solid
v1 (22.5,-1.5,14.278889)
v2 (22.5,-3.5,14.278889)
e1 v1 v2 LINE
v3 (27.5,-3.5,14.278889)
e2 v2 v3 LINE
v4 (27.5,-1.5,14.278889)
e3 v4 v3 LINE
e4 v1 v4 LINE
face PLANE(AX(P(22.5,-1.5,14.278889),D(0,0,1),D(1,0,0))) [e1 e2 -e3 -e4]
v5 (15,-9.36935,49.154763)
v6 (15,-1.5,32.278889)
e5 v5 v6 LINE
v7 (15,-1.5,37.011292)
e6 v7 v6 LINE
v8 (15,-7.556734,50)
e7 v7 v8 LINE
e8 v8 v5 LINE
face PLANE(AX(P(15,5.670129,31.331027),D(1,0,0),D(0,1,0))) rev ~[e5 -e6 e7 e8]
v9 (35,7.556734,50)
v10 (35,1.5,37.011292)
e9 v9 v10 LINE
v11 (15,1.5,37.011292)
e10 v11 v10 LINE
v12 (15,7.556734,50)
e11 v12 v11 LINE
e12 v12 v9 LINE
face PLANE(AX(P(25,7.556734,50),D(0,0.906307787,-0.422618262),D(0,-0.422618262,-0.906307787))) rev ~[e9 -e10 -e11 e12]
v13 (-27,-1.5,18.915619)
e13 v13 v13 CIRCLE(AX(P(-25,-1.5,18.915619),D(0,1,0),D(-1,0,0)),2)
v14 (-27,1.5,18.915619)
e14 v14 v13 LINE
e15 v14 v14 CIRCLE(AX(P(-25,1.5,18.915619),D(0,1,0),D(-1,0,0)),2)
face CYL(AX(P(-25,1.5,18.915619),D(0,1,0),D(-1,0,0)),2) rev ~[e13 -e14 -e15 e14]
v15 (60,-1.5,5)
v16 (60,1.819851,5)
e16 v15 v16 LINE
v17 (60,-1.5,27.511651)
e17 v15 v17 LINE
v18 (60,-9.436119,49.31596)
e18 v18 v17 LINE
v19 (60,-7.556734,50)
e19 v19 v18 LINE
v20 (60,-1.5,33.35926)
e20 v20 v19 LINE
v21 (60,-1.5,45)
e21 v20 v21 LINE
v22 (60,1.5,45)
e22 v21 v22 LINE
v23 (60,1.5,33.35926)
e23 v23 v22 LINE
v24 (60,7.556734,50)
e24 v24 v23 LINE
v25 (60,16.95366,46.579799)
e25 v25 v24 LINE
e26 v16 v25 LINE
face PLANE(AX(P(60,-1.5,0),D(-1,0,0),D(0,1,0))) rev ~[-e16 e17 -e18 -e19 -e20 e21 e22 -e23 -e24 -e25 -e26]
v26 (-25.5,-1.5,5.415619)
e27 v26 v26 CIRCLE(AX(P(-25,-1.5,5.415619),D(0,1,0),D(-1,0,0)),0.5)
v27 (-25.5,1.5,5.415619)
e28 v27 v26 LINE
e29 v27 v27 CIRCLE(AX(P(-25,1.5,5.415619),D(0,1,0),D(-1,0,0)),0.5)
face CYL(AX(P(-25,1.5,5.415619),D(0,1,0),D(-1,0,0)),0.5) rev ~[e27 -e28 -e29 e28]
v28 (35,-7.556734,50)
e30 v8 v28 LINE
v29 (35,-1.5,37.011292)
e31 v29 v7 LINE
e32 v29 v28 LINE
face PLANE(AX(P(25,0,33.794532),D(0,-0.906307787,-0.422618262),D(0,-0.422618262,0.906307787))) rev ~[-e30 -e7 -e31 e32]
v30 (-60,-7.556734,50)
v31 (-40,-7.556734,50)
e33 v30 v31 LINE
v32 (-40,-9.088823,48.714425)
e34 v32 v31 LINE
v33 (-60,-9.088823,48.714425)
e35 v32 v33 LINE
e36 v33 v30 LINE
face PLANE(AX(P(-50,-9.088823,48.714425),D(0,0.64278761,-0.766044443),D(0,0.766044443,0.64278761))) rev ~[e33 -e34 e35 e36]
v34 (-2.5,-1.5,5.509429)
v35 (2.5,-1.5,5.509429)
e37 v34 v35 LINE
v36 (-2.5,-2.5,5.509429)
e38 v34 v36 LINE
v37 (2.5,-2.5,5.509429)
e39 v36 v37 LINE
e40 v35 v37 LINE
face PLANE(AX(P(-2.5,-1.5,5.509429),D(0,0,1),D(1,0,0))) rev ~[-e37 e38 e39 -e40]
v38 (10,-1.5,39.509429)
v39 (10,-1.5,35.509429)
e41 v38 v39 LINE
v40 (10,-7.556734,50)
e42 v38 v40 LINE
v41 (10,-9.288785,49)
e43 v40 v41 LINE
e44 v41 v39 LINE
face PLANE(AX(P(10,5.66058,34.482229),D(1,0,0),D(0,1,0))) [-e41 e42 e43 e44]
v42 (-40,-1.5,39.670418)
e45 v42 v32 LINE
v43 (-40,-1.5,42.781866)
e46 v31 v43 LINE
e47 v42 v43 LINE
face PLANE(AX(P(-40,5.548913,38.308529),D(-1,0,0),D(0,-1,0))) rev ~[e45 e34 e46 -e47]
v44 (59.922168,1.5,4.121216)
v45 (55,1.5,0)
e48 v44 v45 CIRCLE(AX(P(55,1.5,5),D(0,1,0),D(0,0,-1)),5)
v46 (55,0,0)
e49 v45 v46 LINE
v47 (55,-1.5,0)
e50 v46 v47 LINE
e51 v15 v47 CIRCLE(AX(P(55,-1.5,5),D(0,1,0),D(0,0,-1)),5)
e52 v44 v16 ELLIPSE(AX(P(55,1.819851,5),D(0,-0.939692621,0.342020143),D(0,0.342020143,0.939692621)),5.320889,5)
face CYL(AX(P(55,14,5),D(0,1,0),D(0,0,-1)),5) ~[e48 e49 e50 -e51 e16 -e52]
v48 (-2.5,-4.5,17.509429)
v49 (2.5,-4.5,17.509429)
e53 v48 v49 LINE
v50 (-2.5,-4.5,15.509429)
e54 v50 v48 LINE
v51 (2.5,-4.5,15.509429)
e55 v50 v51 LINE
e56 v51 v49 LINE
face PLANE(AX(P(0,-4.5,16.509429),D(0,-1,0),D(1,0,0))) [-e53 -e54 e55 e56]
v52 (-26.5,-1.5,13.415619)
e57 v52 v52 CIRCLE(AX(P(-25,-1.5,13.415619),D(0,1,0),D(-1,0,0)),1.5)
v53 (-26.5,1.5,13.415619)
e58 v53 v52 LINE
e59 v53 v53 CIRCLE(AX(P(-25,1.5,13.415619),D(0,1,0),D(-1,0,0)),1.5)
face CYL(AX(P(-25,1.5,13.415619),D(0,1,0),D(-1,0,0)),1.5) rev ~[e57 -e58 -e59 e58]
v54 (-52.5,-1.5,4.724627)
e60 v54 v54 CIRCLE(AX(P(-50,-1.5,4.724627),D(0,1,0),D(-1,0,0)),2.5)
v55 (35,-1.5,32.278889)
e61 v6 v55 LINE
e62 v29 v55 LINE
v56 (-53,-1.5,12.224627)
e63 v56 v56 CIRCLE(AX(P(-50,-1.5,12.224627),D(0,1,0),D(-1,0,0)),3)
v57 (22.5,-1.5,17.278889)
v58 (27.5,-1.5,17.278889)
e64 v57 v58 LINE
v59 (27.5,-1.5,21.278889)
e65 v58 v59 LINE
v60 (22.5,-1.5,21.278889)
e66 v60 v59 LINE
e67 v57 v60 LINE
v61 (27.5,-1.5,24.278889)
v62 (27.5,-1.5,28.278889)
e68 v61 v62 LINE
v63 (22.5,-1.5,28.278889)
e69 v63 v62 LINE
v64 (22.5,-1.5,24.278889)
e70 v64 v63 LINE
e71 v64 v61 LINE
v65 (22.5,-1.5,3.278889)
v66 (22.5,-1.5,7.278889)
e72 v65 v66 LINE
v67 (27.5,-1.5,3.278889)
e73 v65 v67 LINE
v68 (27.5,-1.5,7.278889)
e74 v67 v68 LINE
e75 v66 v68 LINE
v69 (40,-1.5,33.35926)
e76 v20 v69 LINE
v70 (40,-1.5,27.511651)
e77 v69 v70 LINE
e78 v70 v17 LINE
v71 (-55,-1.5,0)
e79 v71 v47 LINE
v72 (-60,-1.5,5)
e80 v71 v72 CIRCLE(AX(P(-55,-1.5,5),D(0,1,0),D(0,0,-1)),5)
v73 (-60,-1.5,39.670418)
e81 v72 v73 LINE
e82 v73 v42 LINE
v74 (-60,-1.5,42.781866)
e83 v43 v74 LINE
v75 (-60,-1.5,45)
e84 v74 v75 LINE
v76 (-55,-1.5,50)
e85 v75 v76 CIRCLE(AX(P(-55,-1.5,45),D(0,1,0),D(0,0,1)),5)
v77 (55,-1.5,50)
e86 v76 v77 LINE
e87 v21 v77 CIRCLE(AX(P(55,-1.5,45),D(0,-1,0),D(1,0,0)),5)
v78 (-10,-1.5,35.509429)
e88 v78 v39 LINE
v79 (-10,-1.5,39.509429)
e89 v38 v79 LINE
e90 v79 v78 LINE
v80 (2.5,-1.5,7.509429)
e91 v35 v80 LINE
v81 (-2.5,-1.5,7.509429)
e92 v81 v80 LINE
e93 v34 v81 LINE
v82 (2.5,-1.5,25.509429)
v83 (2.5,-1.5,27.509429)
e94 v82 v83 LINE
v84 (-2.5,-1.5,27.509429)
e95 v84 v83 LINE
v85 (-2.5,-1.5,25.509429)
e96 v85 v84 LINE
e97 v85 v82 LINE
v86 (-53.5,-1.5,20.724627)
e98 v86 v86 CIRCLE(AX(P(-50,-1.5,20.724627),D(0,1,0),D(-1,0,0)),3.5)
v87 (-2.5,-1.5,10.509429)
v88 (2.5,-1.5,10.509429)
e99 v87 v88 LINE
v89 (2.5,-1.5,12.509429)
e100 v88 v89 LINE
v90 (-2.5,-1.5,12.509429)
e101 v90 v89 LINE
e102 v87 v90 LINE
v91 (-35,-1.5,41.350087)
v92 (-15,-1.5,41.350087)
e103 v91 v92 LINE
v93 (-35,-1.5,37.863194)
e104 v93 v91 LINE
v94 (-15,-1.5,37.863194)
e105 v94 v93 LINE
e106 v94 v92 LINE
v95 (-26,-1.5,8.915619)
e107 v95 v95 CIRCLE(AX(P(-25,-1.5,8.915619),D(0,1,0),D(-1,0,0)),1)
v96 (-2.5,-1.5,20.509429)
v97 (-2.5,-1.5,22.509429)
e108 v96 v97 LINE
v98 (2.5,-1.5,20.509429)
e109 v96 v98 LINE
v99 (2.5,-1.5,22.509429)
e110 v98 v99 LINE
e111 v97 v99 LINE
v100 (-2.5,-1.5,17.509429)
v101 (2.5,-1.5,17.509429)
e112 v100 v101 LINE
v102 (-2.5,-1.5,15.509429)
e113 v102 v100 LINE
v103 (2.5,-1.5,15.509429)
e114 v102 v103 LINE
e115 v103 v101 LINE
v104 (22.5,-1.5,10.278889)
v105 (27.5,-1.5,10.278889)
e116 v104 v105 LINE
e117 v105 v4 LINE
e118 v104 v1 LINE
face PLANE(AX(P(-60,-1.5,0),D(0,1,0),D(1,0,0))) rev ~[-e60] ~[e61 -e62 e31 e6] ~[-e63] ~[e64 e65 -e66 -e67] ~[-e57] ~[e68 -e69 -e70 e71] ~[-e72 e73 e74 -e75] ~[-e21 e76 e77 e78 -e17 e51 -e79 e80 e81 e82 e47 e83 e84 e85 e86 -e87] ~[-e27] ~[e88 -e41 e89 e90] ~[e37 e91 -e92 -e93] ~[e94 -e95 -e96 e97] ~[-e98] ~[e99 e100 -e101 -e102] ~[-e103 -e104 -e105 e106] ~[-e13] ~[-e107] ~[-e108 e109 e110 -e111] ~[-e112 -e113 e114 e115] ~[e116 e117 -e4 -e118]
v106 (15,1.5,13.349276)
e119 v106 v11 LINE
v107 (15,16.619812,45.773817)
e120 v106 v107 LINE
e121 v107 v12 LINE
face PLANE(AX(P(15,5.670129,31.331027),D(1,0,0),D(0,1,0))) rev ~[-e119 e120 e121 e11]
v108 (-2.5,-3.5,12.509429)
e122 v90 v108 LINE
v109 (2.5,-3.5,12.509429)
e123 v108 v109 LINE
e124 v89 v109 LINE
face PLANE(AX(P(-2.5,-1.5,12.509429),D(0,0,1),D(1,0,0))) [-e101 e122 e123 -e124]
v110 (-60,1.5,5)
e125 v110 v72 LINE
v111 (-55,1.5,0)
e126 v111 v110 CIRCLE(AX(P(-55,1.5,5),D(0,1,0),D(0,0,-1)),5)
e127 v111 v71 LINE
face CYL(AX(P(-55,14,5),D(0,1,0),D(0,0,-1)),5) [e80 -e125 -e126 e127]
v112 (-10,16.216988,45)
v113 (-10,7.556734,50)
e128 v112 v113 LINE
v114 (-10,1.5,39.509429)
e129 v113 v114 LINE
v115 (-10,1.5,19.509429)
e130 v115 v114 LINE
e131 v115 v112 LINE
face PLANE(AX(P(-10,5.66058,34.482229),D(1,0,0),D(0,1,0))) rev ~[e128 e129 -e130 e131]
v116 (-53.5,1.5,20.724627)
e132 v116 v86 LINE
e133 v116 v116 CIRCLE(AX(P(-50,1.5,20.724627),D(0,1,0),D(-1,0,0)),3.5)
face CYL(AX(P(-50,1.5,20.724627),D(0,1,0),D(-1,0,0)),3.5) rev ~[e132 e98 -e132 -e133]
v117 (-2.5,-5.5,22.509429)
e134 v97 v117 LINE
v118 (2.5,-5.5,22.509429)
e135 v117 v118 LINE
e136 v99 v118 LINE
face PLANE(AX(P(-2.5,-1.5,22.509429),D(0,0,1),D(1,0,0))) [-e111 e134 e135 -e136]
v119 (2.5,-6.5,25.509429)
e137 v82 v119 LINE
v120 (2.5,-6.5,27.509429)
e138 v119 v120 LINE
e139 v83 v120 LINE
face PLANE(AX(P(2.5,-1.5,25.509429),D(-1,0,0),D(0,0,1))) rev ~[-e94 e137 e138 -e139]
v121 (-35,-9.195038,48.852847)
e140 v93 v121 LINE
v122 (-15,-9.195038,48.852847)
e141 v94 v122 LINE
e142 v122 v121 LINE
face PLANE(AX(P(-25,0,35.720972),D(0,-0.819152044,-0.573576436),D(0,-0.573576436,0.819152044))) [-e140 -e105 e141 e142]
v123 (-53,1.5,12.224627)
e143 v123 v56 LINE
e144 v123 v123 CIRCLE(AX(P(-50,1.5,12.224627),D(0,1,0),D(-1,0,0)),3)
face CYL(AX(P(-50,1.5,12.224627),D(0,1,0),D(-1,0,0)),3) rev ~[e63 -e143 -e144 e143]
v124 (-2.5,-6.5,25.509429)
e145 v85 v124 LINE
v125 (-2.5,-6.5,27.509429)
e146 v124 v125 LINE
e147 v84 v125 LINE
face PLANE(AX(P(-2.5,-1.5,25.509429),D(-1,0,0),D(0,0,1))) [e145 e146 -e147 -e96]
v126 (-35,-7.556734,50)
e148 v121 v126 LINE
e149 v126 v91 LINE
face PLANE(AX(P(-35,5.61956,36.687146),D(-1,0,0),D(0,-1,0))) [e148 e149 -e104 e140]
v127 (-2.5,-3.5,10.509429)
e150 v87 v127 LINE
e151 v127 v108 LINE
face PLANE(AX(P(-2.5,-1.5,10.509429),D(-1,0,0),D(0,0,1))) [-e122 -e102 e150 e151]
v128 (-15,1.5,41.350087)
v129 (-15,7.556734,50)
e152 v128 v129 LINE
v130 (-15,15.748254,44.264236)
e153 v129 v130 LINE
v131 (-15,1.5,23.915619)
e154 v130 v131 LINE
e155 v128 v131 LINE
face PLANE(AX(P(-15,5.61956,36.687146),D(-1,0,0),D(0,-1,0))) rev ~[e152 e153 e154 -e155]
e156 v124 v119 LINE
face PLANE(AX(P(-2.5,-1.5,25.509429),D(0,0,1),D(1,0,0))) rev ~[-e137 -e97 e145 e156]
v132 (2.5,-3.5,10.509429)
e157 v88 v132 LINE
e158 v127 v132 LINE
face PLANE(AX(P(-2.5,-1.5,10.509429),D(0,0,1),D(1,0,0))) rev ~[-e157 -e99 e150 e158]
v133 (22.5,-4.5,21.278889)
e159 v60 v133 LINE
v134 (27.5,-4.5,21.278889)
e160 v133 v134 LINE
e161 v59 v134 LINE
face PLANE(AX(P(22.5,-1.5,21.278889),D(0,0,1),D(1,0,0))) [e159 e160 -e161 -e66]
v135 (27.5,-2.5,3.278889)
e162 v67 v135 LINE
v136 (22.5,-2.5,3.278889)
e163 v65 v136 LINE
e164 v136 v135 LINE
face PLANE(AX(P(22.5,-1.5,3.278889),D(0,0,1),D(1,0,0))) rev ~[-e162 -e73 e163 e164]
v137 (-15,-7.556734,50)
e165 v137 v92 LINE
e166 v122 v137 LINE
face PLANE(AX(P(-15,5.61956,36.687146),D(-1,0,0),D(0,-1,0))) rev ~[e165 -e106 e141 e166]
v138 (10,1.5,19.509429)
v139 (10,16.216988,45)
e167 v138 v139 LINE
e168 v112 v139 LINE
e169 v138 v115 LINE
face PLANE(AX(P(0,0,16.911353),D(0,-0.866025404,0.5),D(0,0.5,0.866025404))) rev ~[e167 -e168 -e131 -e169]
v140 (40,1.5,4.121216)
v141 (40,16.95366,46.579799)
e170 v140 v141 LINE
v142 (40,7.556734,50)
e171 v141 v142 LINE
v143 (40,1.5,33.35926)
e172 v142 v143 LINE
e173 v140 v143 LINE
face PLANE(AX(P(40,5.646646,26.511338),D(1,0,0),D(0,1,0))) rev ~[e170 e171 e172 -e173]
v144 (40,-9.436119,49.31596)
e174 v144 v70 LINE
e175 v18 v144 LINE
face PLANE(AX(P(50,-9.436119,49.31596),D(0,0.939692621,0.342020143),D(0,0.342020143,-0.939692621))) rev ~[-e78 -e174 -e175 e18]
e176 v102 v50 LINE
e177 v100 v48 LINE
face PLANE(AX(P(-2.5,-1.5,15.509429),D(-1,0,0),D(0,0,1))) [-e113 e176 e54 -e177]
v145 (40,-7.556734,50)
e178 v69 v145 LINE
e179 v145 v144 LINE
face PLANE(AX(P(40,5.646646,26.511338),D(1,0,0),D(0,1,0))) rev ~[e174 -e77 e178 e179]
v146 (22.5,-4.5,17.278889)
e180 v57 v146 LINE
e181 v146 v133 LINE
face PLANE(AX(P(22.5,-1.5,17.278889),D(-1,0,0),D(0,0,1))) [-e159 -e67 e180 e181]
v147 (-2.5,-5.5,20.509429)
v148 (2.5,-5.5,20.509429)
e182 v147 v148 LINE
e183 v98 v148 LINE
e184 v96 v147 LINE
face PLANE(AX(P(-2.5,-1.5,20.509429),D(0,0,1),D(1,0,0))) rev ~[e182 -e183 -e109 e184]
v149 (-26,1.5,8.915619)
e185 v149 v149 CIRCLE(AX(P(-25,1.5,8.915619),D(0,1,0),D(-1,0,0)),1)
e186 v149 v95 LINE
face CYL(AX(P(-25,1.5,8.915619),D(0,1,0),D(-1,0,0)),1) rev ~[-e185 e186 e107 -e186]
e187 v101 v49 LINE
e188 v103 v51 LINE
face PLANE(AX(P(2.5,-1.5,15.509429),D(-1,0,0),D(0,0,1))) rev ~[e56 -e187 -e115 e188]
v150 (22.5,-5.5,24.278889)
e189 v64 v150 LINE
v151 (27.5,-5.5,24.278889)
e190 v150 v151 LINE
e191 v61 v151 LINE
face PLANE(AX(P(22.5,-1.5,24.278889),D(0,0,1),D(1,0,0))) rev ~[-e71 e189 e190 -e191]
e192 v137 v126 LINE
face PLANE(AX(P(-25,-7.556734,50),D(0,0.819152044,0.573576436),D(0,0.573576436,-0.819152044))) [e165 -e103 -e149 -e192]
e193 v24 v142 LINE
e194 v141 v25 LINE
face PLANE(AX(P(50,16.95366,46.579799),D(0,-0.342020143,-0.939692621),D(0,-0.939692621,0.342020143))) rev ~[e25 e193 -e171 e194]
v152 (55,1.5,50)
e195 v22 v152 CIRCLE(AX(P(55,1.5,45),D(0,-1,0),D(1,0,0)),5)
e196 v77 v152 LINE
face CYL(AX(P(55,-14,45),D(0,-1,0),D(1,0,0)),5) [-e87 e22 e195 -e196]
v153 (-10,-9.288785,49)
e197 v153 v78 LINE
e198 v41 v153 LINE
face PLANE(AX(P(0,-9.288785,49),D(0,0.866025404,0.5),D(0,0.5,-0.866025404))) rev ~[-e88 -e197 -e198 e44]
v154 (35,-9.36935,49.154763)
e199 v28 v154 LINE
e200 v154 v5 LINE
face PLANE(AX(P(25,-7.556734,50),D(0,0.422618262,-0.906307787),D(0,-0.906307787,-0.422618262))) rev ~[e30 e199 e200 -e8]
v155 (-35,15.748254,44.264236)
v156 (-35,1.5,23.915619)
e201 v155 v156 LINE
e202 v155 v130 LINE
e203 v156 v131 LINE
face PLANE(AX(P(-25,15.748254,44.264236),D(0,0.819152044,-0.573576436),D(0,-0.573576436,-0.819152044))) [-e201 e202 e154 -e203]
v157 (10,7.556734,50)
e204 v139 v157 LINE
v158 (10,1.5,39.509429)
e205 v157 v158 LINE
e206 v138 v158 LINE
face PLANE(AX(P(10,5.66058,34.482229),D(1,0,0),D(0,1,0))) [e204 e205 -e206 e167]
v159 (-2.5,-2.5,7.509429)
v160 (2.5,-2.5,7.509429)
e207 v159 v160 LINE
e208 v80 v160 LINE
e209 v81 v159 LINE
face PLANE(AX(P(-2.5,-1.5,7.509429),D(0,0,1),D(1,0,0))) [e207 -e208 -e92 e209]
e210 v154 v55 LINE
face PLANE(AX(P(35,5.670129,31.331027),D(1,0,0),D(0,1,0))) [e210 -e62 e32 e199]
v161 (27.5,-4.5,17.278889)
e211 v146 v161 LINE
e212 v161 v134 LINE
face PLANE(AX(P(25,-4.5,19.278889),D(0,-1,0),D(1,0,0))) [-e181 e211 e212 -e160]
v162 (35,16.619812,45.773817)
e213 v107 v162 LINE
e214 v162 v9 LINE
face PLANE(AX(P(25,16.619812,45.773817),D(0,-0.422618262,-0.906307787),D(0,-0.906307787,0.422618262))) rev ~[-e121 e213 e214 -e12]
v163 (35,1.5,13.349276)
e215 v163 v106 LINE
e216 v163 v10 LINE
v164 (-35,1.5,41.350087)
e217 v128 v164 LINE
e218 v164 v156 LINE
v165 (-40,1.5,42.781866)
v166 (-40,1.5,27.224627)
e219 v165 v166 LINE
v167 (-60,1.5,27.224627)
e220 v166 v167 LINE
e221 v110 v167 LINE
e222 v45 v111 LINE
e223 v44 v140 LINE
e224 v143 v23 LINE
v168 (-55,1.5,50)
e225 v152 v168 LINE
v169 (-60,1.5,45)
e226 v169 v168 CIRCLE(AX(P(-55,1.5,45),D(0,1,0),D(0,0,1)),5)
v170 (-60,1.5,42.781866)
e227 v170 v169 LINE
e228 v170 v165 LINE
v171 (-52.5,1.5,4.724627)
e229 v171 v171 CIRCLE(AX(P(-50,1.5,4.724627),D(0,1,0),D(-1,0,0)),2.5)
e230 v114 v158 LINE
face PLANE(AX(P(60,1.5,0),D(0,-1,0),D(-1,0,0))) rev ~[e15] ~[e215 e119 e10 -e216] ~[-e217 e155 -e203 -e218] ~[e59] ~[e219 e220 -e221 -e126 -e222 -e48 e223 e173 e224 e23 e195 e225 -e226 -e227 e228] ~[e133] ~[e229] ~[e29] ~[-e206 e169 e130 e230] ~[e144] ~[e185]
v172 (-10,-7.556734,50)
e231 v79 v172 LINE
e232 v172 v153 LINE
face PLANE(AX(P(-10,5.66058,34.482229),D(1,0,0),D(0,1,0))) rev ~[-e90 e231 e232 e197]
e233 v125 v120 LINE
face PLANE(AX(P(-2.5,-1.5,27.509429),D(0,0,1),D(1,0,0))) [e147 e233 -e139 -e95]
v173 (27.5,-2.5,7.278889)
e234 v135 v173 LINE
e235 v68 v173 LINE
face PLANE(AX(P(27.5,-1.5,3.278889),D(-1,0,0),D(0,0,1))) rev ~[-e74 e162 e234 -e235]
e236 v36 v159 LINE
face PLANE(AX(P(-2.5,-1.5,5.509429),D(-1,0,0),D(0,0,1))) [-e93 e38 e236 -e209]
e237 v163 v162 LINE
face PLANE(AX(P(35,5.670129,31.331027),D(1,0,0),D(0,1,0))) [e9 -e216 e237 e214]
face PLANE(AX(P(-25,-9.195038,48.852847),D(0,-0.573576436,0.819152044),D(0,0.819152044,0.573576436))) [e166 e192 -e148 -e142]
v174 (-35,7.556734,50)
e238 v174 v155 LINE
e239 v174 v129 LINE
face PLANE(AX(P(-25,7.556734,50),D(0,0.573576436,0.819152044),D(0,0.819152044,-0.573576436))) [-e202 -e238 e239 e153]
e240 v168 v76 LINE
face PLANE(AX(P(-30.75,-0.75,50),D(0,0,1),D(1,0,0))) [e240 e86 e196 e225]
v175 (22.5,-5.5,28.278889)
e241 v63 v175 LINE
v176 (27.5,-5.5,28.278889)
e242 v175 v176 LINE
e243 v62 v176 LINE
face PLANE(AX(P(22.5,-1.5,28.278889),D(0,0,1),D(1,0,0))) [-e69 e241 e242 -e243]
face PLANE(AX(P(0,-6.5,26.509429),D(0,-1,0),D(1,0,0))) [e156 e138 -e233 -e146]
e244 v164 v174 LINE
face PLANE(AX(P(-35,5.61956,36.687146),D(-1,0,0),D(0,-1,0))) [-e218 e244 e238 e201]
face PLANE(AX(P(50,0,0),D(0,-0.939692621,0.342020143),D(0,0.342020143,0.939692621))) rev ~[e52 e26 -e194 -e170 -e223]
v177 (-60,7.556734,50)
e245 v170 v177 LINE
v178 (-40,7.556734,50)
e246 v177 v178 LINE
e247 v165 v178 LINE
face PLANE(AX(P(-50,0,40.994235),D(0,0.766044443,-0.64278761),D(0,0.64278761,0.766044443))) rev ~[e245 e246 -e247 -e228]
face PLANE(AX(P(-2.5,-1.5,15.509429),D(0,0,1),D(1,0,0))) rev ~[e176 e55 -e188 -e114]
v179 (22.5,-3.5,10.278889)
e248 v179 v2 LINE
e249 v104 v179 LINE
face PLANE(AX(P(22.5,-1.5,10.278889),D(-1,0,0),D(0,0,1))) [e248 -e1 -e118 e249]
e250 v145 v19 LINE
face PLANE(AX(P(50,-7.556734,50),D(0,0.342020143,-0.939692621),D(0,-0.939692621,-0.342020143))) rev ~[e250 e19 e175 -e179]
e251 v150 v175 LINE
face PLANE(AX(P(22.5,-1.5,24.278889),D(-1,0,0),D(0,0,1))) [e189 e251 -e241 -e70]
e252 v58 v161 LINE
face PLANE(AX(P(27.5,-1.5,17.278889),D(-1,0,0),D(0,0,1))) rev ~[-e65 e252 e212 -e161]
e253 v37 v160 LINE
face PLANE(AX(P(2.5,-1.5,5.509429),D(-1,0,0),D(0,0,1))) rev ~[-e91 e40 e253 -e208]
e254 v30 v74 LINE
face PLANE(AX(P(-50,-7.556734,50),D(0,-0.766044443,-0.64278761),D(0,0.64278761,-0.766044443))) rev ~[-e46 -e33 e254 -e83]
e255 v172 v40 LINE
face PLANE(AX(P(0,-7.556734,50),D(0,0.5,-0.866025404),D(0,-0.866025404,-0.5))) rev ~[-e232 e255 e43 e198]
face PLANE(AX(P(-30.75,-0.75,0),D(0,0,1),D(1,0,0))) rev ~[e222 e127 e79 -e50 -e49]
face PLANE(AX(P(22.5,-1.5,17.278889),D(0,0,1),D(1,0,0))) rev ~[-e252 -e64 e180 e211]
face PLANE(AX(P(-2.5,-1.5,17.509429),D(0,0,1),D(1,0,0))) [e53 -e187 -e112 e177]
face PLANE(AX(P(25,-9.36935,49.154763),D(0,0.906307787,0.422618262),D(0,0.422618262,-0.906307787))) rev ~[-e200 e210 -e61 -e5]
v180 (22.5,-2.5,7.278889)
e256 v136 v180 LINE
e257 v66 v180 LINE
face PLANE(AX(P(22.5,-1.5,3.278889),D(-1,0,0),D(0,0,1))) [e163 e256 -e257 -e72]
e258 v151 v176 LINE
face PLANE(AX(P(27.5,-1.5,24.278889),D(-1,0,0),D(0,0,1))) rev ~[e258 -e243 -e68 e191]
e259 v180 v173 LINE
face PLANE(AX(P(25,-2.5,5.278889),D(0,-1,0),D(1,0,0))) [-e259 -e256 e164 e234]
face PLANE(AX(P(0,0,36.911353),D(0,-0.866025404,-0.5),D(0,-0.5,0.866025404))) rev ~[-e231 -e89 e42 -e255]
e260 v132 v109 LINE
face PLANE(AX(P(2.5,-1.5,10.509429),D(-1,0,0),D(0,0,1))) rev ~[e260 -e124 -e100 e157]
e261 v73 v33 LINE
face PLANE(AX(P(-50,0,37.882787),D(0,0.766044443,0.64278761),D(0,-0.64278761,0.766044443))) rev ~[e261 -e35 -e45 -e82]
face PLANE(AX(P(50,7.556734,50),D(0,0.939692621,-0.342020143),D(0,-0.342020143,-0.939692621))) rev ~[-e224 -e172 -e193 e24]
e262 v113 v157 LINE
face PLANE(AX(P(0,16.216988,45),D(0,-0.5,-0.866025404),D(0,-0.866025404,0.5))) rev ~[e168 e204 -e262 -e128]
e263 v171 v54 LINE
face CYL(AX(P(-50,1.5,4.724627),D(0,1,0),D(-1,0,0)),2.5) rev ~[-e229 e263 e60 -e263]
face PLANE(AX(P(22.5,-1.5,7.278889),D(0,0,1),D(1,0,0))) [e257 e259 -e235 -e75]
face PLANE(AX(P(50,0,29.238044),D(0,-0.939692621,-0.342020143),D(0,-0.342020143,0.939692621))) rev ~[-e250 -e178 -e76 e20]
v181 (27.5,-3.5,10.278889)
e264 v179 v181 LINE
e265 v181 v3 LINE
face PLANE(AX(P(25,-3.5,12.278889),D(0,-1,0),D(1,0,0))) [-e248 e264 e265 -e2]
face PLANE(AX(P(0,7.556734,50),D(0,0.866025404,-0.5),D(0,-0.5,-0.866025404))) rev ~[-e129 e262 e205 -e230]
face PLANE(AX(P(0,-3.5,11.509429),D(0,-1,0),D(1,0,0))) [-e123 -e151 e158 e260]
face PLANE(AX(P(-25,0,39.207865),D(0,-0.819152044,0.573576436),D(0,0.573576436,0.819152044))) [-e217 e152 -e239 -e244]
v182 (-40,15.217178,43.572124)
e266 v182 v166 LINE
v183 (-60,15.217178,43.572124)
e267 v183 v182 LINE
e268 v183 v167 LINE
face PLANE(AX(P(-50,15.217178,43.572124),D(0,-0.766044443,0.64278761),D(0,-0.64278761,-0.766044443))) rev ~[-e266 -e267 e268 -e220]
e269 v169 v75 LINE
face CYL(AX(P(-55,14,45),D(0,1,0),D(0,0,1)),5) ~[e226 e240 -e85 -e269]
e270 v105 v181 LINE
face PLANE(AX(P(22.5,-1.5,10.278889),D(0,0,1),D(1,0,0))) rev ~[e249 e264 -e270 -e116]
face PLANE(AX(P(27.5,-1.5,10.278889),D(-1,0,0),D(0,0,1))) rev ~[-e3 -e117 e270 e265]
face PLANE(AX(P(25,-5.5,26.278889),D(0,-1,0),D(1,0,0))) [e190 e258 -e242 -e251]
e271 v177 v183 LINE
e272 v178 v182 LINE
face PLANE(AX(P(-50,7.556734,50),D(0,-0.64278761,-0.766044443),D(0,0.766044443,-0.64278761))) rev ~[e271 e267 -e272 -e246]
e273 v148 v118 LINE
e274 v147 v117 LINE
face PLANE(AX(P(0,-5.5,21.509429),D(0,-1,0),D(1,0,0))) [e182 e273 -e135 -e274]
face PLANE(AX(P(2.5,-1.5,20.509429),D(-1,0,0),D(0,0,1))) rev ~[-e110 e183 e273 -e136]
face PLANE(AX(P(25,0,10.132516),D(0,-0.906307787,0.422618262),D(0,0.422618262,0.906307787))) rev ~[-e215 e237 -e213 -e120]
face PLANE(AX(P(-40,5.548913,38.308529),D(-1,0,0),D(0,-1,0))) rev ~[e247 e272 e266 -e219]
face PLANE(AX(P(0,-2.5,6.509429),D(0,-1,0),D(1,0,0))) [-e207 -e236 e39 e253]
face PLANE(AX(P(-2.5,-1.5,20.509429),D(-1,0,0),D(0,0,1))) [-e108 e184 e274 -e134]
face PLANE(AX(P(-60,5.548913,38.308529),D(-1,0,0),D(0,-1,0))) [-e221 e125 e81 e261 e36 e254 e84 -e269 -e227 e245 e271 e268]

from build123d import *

# Parameters (mm, degrees)
F0_W          = 58.5
F0_H          = 1.5
F0_H_2        = 3
F1_DEPTH      = 50
F9_DEPTH      = 10
F10_T1_DEPTH  = 28
F10_T3_DEPTH  = 14
F10_T5_DEPTH  = 14
F10_T10_DEPTH = 28
F10_T16_DEPTH = 28
F11_R         = 0.5
F11_R_2       = 1
F11_R_3       = 1.5
F11_R_4       = 2
F11_R_5       = 2.5
F11_R_6       = 3
F11_R_7       = 3.5
F12_DEPTH     = 3
F13_W         = 5
F13_H         = 2
F14_W         = 5
F14_H         = 4
F15_DEPTH     = 1
F16_DEPTH     = 2
F17_DEPTH     = 3
F18_DEPTH     = 4
F19_DEPTH     = 5


# Not quite as in the source:
# - a fillet or chamfer that OpenCascade refuses, or shapes differently, is made with other operations: its cross-section is extruded or revolved along the edge and cut away or added


with BuildPart() as f1:
    # F0 (on Top) → F1 (new body)
    with BuildSketch(Plane.XY):
        with Locations((-30.75, -0.75)):
            Rectangle(F0_W, F0_H)
        with Locations((-30.75, 0.75)):
            Rectangle(F0_W, F0_H)
        Polygon((1.5, 1.5), (-1.5, 1.5), (-1.5, 0), (-1.5, -1.5), (1.5, -1.5), align=None)
        with Locations((30.75, 0)):
            Rectangle(F0_W, F0_H_2)
    extrude(amount=F1_DEPTH)

    # F4 (on offset) + F5 (on offset) + F6 (on Right) + F7 (on face) + F8 (on face) → F9 (join, symmetric)
    with BuildSketch(Plane.YZ.offset(50)):
        Polygon((0, 23.3904352013), (0, 0), (16.9536601964, 46.5797985667), (7.5567339886, 50), (0, 29.2380440016), align=None)
        Polygon((-9.4361192301, 49.3159597133), (0, 23.3904352013), (0, 29.2380440016), (-7.5567339886, 50), align=None)
    with BuildSketch(Plane.YZ.offset(25)):
        Polygon((0, 29.0621284988), (0, 10.1325158336), (16.6198118589, 45.7738173826), (7.5567339886, 50), (0, 33.7945316651), align=None)
        Polygon((-9.3693495626, 49.1547634765), (0, 29.0621284988), (0, 33.7945316651), (-7.5567339886, 50), align=None)
    with BuildSketch(Plane.YZ):
        Polygon((0, 32.9113527925), (0, 16.9113527925), (16.2169880264, 45), (7.5567339886, 50), (0, 36.9113527925), align=None)
        Polygon((-9.2887847961, 49), (0, 32.9113527925), (0, 36.9113527925), (-7.5567339886, 50), align=None)
    with BuildSketch(Plane(origin=(-25, 0, 0), x_dir=(0, -1, 0), z_dir=(-1, 0, 0))):
        Polygon((-15.7482544314, 44.2642356365), (0, 21.7733974606), (0, 35.7209718255), (0, 39.2078654168), (-7.5567339886, 50), align=None)
        Polygon((0, 39.2078654168), (0, 35.7209718255), (9.1950380771, 48.8528471273), (7.5567339886, 50), align=None)
    with BuildSketch(Plane(origin=(-50, 0, 0), x_dir=(0, -1, 0), z_dir=(-1, 0, 0))):
        Polygon((-15.2171784197, 43.5721239031), (0, 25.4369968523), (0, 37.8827874671), (0, 40.9942351209), (-7.5567339886, 50), align=None)
        Polygon((0, 40.9942351209), (0, 37.8827874671), (9.0888228748, 48.7144247806), (7.5567339886, 50), align=None)
    extrude(amount=F9_DEPTH, both=True, dir=(1, 0, 0))

    # F10: fillet of radius 5 on 5 edges, made by hand

    # F10_s2 → F10_t1 (cut)
    with BuildSketch(Plane.XZ.offset(-14)):
        with BuildLine():
            ThreePointArc((-55, 0), (-58.5355339059, 1.4644660941), (-60, 5))
            Line((-60, 5), (-60, 0))
            Line((-60, 0), (-55, 0))
        make_face()
    extrude(amount=F10_T1_DEPTH, mode=Mode.SUBTRACT)

    # F10_s4 → F10_t3 (cut)
    with BuildSketch(Plane.XZ):
        with BuildLine():
            ThreePointArc((55, 0), (58.5355339059, 1.4644660941), (60, 5))
            Line((60, 5), (60, 0))
            Line((60, 0), (55, 0))
        make_face()
    extrude(amount=F10_T3_DEPTH, mode=Mode.SUBTRACT)

    # F10_s6 → F10_t5 (cut)
    with BuildSketch(Plane.XZ.offset(-14)):
        with BuildLine():
            ThreePointArc((55, 0), (58.5355339059, 1.4644660941), (60, 5))
            Line((60, 5), (60, 0))
            Line((60, 0), (55, 0))
        make_face()
    extrude(amount=F10_T5_DEPTH, mode=Mode.SUBTRACT)


with BuildPart() as f10_tool8:
    # F10_s9 → F10_t10 (new body)
    with BuildSketch(Plane.XZ.offset(14)):
        with BuildLine():
            ThreePointArc((60, 45), (58.5355339059, 48.5355339059), (55, 50))
            Line((55, 50), (60, 50))
            Line((60, 50), (60, 45))
        make_face()
    extrude(amount=-F10_T10_DEPTH)

    split(bisect_by=Plane(origin=(0, 9.3969262079, 3.4202014333), x_dir=(1, 0, 0), z_dir=(0, 0.9396926208, 0.3420201433)), keep=Keep.TOP)

    split(bisect_by=Plane(origin=(0, -9.3969262079, 3.4202014333), x_dir=(1, 0, 0), z_dir=(0, -0.9396926208, 0.3420201433)), keep=Keep.TOP)


with BuildPart() as f1_1:
    add(f1.part)

    # F10_t7: cut F10_tool8
    add(f10_tool8.part, mode=Mode.SUBTRACT)


with BuildPart() as f10_tool14:
    # F10_s15 → F10_t16 (new body)
    with BuildSketch(Plane.XZ.offset(-14)):
        with BuildLine():
            ThreePointArc((-55, 50), (-58.5355339059, 48.5355339059), (-60, 45))
            Line((-60, 45), (-60, 50))
            Line((-60, 50), (-55, 50))
        make_face()
    extrude(amount=F10_T16_DEPTH)

    split(bisect_by=Plane(origin=(0, 20.1857202879, 16.9378304486), x_dir=(1, 0, 0), z_dir=(0, 0.7660444431, 0.6427876097)), keep=Keep.TOP)

    split(bisect_by=Plane(origin=(0, -20.1857202879, 16.9378304486), x_dir=(1, 0, 0), z_dir=(0, -0.7660444431, 0.6427876097)), keep=Keep.TOP)


with BuildPart() as f1_2:
    add(f1_1.part)

    # F10_t13: cut F10_tool14
    add(f10_tool14.part, mode=Mode.SUBTRACT)

    # F11 (on face) → F12 (cut, through all)
    with BuildSketch(Plane(origin=(0, 1.5, 0), x_dir=(-1, 0, 0), z_dir=(0, 1, 0))):
        with Locations((25, 5.4156194707)):
            Circle(F11_R)
        with Locations((25, 8.9156194707)):
            Circle(F11_R_2)
        with Locations((25, 13.4156194707)):
            Circle(F11_R_3)
        with Locations((25, 18.9156194707)):
            Circle(F11_R_4)
        with Locations((50, 4.7246272412)):
            Circle(F11_R_5)
        with Locations((50, 12.2246272412)):
            Circle(F11_R_6)
        with Locations((50, 20.7246272412)):
            Circle(F11_R_7)
    extrude(amount=-F12_DEPTH, mode=Mode.SUBTRACT)

    # F13 (on face) + F14 (on face) → F15 (join)
    with BuildSketch(Plane.XZ.offset(1.5)):
        with Locations((0, 6.5094290039)):
            Rectangle(F13_W, F13_H)
    with BuildSketch(Plane.XZ.offset(1.5)):
        with Locations((25, 5.2788888796)):
            Rectangle(F14_W, F14_H)
    extrude(amount=F15_DEPTH)

    # F13 (on face) + F14 (on face) → F16 (join)
    with BuildSketch(Plane.XZ.offset(1.5)):
        with Locations((0, 11.5094290039)):
            Rectangle(F13_W, F13_H)
    with BuildSketch(Plane.XZ.offset(1.5)):
        with Locations((25, 12.2788888796)):
            Rectangle(F14_W, F14_H)
    extrude(amount=F16_DEPTH)

    # F13 (on face) + F14 (on face) → F17 (join)
    with BuildSketch(Plane.XZ.offset(1.5)):
        with Locations((0, 16.5094290039)):
            Rectangle(F13_W, F13_H)
    with BuildSketch(Plane.XZ.offset(1.5)):
        with Locations((25, 19.2788888796)):
            Rectangle(F14_W, F14_H)
    extrude(amount=F17_DEPTH)

    # F13 (on face) + F14 (on face) → F18 (join)
    with BuildSketch(Plane.XZ.offset(1.5)):
        with Locations((0, 21.5094290039)):
            Rectangle(F13_W, F13_H)
    with BuildSketch(Plane.XZ.offset(1.5)):
        with Locations((25, 26.2788888796)):
            Rectangle(F14_W, F14_H)
    extrude(amount=F18_DEPTH)

    # F13 (on face) → F19 (join)
    with BuildSketch(Plane.XZ.offset(1.5)):
        with Locations((0, 26.5094290039)):
            Rectangle(F13_W, F13_H)
    extrude(amount=F19_DEPTH)


solid = f1_2.part
